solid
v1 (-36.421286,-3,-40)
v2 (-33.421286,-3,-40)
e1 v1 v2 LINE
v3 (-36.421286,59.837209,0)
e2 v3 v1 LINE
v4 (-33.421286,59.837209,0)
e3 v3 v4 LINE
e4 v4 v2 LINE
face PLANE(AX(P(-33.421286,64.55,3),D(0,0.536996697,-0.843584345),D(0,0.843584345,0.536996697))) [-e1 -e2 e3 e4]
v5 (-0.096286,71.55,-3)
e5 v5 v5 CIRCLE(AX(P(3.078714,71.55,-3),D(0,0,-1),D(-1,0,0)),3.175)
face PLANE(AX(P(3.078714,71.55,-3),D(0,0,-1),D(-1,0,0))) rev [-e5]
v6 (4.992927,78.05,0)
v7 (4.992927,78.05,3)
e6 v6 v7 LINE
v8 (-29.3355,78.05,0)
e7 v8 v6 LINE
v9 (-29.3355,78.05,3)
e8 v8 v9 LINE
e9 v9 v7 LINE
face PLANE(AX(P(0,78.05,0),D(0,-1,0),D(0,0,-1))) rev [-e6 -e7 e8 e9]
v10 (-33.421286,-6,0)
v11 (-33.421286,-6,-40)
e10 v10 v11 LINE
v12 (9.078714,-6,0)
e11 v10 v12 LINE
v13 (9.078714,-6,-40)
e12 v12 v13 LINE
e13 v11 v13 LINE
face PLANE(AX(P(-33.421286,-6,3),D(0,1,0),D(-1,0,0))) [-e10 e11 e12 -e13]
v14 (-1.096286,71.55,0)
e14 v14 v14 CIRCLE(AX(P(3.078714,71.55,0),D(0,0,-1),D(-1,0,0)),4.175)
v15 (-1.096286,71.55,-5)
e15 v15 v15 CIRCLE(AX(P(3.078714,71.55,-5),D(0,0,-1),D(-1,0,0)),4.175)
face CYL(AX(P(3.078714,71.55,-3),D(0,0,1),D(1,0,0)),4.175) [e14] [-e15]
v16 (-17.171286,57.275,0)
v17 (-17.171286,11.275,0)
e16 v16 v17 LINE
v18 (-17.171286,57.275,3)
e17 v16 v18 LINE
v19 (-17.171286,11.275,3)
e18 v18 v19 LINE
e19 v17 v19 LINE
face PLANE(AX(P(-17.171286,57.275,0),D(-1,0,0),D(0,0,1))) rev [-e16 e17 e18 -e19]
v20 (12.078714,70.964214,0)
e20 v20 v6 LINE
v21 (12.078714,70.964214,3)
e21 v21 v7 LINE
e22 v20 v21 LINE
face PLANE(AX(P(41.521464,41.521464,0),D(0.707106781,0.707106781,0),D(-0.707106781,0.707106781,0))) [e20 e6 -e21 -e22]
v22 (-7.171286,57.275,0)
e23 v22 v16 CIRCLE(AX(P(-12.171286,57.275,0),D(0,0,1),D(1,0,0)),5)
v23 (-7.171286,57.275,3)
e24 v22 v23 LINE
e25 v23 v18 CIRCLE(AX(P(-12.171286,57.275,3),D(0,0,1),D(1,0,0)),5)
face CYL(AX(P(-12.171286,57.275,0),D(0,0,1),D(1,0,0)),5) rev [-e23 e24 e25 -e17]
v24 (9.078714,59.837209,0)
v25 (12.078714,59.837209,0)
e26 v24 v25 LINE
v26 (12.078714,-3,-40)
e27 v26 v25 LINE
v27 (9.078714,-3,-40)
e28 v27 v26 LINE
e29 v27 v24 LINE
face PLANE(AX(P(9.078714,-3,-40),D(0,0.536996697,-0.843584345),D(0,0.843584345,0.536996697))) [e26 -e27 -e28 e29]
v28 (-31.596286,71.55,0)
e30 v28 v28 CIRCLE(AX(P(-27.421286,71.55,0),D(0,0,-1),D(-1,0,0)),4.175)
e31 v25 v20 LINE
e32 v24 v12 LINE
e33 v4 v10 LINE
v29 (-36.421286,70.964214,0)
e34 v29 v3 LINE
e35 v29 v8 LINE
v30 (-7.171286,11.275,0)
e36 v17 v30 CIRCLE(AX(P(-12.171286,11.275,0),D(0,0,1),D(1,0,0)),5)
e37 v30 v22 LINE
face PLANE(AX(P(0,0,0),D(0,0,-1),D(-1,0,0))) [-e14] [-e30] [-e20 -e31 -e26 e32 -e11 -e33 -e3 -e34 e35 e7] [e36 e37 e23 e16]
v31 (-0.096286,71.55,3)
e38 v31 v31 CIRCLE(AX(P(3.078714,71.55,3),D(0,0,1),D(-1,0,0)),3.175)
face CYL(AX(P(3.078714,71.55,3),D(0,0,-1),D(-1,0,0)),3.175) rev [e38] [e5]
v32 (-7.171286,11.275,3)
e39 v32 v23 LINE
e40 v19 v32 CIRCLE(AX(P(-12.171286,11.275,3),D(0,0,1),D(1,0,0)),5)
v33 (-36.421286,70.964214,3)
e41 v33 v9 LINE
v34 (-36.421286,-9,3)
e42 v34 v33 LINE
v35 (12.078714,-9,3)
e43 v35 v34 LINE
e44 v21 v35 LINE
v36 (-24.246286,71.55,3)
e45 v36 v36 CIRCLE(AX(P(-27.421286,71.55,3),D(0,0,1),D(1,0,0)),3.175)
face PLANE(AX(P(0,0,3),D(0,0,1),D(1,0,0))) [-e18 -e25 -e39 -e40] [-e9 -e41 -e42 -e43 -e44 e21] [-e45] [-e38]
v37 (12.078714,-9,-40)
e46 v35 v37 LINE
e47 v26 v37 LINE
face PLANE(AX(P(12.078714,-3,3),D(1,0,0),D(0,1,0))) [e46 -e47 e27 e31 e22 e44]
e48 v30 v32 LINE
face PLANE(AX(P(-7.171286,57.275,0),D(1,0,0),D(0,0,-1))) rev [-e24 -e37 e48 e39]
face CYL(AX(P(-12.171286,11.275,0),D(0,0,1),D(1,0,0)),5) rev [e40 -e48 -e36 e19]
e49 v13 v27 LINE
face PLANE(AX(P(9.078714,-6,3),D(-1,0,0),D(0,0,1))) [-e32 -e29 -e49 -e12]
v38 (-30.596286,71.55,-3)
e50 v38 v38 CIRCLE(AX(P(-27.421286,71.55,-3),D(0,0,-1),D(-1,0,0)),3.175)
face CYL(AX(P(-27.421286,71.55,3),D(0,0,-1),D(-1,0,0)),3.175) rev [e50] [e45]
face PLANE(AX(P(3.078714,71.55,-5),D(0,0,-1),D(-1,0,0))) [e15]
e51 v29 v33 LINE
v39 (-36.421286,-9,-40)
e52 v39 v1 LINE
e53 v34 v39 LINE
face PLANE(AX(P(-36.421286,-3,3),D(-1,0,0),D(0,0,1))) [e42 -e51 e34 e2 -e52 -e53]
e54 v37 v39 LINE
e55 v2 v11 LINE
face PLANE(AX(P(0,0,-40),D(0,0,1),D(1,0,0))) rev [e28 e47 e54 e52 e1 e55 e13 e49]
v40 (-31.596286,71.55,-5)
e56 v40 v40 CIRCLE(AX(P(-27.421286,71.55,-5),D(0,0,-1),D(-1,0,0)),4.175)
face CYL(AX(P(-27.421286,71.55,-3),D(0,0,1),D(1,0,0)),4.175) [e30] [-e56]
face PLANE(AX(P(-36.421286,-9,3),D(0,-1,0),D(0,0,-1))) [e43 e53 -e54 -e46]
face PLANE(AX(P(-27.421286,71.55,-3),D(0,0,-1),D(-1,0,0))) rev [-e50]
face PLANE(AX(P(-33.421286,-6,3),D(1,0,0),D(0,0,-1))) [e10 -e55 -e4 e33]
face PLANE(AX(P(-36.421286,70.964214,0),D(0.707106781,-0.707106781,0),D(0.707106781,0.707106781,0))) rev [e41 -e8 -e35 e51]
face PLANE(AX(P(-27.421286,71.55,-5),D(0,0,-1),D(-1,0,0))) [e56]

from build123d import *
from build123d.topology import SkipClean

# Parameters (mm, degrees)
SKETCH1_R                = 1.55
SKETCH1_R_2              = 1.5
SKETCH1_R_3              = 11
SKETCH1_R_4              = 3.175
BOSS_EXTRUDE1_DEPTH      = 3
BOSS_EXTRUDE2_START      = 3
SKETCH2_R                = 4.175
SKETCH2_R_2              = 3.175
BOSS_EXTRUDE2_DEPTH      = 3
BOSS_EXTRUDE3_START      = 2
SKETCH3_R                = 4.175
BOSS_EXTRUDE3_DEPTH      = 2
BOSS_EXTRUDE4_DEPTH      = 40
BOSS_EXTRUDE4_DEPTH_BACK = 3
SKETCH5_W                = 3
SKETCH5_H                = 5
BOSS_EXTRUDE5_DEPTH      = 3
BOSS_EXTRUDE7_DEPTH      = 3
BOSS_EXTRUDE9_DEPTH      = 3
BOSS_EXTRUDE10_START     = -3
SKETCH9_R                = 1.55
SKETCH9_R_2              = 1.5
SKETCH9_R_3              = 11
BOSS_EXTRUDE10_DEPTH     = 3
CUT_EXTRUDE1_DEPTH       = 3
SKETCH11_W               = 3
SKETCH11_H               = 75.55
BOSS_EXTRUDE11_DEPTH     = 3
CHAMFER1_SIZE            = 3
BOSS_EXTRUDE12_DEPTH     = 3
BOSS_EXTRUDE13_DEPTH     = 3
BOSS_EXTRUDE14_DEPTH     = 3


with BuildPart() as part:
    # Sketch1 → Boss-Extrude1 (new body)
    with BuildSketch(Plane.XY):
        Polygon((-33.421286346, -6), (-33.421286346, 36.5), (-33.421286346, 72.55), (-28.421286346, 77.55), (4.078713654, 77.55), (9.078713654, 72.55), (9.078713654, 36.5), (9.078713654, -6), align=None)
        with Locations((2.92772434, 30.5)):
            Circle(SKETCH1_R, mode=Mode.SUBTRACT)
        with Locations(Location((2.92772434, -0.5, 0), (0, 0, 180))):
            Circle(SKETCH1_R_2, mode=Mode.SUBTRACT)
        with Locations((-27.671286346, -0.5)):
            Circle(SKETCH1_R_2, mode=Mode.SUBTRACT)
        with Locations(Location((-28.07227566, 30.5, 0), (0, 0, 180))):
            Circle(SKETCH1_R_2, mode=Mode.SUBTRACT)
        with Locations((-12.171286346, 15.25)):
            Circle(SKETCH1_R_3, mode=Mode.SUBTRACT)
        with Locations((-27.421286346, 71.55)):
            Circle(SKETCH1_R_4, mode=Mode.SUBTRACT)
        with Locations(Location((3.078713654, 71.55, 0), (0, 0, 180))):
            Circle(SKETCH1_R_4, mode=Mode.SUBTRACT)
    extrude(amount=BOSS_EXTRUDE1_DEPTH)

    # Sketch2 → Boss-Extrude2 (add)
    # profile 1 of 2: a face of its own
    with SkipClean():  # the faces are left unmerged after this step: merging them gives an invalid solid
        with BuildSketch(Plane(origin=(0, 0, 0), x_dir=(-1, 0, 0), z_dir=(0, 0, -1)).offset(BOSS_EXTRUDE2_START)):
            with Locations((-3.078713654, 71.55)):
                Circle(SKETCH2_R)
            with Locations((-3.078713654, 71.55)):
                Circle(SKETCH2_R_2, mode=Mode.SUBTRACT)
        # profile 2 of 2: a face of its own
        with BuildSketch(Plane(origin=(0, 0, 0), x_dir=(-1, 0, 0), z_dir=(0, 0, -1)).offset(BOSS_EXTRUDE2_START)):
            with Locations((27.421286346, 71.55)):
                Circle(SKETCH2_R)
            with Locations((27.421286346, 71.55)):
                Circle(SKETCH2_R_2, mode=Mode.SUBTRACT)
        extrude(amount=-BOSS_EXTRUDE2_DEPTH)

    # Sketch3 → Boss-Extrude3 (add)
    with SkipClean():  # the faces are left unmerged after this step: merging them gives an invalid solid
        with BuildSketch(Plane(origin=(0, 0, -3), x_dir=(-1, 0, 0), z_dir=(0, 0, -1)).offset(BOSS_EXTRUDE3_START)):
            with Locations((-3.078713654, 71.55)):
                Circle(SKETCH3_R)
            with Locations((27.421286346, 71.55)):
                Circle(SKETCH3_R)
        extrude(amount=-BOSS_EXTRUDE3_DEPTH)

    # Sketch5 → Boss-Extrude5 (add)
    with SkipClean():  # the faces are left unmerged after this step: merging them gives an invalid solid
        with BuildSketch(Plane.XY.offset(3)):
            with Locations((10.578713654, 45.531399611)):
                Rectangle(SKETCH5_W, SKETCH5_H)
            with Locations((-34.921286346, 45.531399611)):
                Rectangle(SKETCH5_W, SKETCH5_H)
        extrude(amount=-BOSS_EXTRUDE5_DEPTH)



with BuildPart() as body_2:
    # Sketch4 → Boss-Extrude4 (new, two sides: drawn at the far end of the back side and taken through both)
    with BuildSketch(Plane(origin=(0, 0, 0), x_dir=(-1, 0, 0), z_dir=(0, 0, -1)).offset(-BOSS_EXTRUDE4_DEPTH_BACK)):
        Polygon((33.421286346, -6), (-9.078713654, -6), (-9.078713654, -3), (-12.078713654, -3), (-12.078713654, -9), (-9.078713654, -9), (34.421286346, -9), (36.421286346, -9), (36.421286346, -3), (33.421286346, -3), align=None)
    extrude(amount=BOSS_EXTRUDE4_DEPTH + BOSS_EXTRUDE4_DEPTH_BACK)


with BuildPart() as part_1:
    with SkipClean():  # the faces are left unmerged after this step: merging them gives an invalid solid
        add(part.part)

        add(body_2.part)  # Boss-Extrude7 merges body 2
        # Sketch6 → Boss-Extrude7 (add)
        with BuildSketch(Plane(origin=(9.078713654, 0, 0), x_dir=(0, 0, -1), z_dir=(1, 0, 0))):
            Polygon((0, 48.031399611), (40, -3), (36.080844313, -3), (0, 43.031399611), align=None)
        extrude(amount=BOSS_EXTRUDE7_DEPTH)

    # Sketch8 → Boss-Extrude9 (add)
    with SkipClean():  # the faces are left unmerged after this step: merging them gives an invalid solid
        with BuildSketch(Plane.ZY.offset(36.421286346)):
            Polygon((0, 48.031399611), (0, 43.031399611), (-36.080844313, -3), (-40, -3), align=None)
        extrude(amount=-BOSS_EXTRUDE9_DEPTH)

    # Sketch9 → Boss-Extrude10 (add)
    with SkipClean():  # the faces are left unmerged after this step: merging them gives an invalid solid
        with BuildSketch(Plane.XY.offset(3).offset(BOSS_EXTRUDE10_START)):
            with Locations((2.92772434, 30.5)):
                Circle(SKETCH9_R)
            with Locations((-28.07227566, 30.5)):
                Circle(SKETCH9_R_2)
            with Locations((-27.671286346, -0.5)):
                Circle(SKETCH9_R_2)
            with Locations((2.92772434, -0.5)):
                Circle(SKETCH9_R_2)
            with Locations((-12.171286346, 15.25)):
                Circle(SKETCH9_R_3)
        extrude(amount=BOSS_EXTRUDE10_DEPTH)

    # Sketch10 → Cut-Extrude1 (cut)
    with BuildSketch(Plane.XY.offset(3)):
        with BuildLine():
            Line((-7.171286346, 57.275), (-7.171286346, 11.275))
            ThreePointArc((-7.171286346, 11.275), (-12.171286346, 6.275), (-17.171286346, 11.275))
            Line((-17.171286346, 11.275), (-17.171286346, 57.275))
            ThreePointArc((-17.171286346, 57.275), (-12.171286346, 62.275), (-7.171286346, 57.275))
        make_face()
    extrude(amount=-CUT_EXTRUDE1_DEPTH, mode=Mode.SUBTRACT)

    # Sketch11 → Boss-Extrude11 (add)
    with BuildSketch(Plane.XY.offset(3)):
        with Locations((-34.921286346, 34.775)):
            Rectangle(SKETCH11_W, SKETCH11_H)
        with Locations((10.578713654, 34.775)):
            Rectangle(SKETCH11_W, SKETCH11_H)
    extrude(amount=-BOSS_EXTRUDE11_DEPTH)

    # Chamfer1
    chamfer1_edges = [part_1.edges().sort_by_distance(p)[0] for p in [
        (-36.421286346, 72.55, 1.5),
        (12.078713654, 72.55, 1.5),
    ]]
    chamfer(chamfer1_edges, length=CHAMFER1_SIZE - 0.0001)  # a hair under: the kernel refuses the full size

    # Sketch12 → Boss-Extrude12 (add)
    with BuildSketch(Plane(origin=(12.078713654, 0, 0), x_dir=(0, 0, -1), z_dir=(1, 0, 0))):
        Polygon((-3, 64.55), (-3, -9), (40, -9), (40, -3), align=None)
    extrude(amount=-BOSS_EXTRUDE12_DEPTH)

    # Sketch13 → Boss-Extrude13 (add)
    with BuildSketch(Plane.ZY.offset(36.421286346)):
        Polygon((3, -9), (3, 64.55), (-40, -3), (-40, -9), align=None)
    extrude(amount=-BOSS_EXTRUDE13_DEPTH)

    # Sketch14 → Boss-Extrude14 (add)
    with BuildSketch(Plane.XY.offset(3)):
        Polygon((-36.421286346, 70.964213562), (-36.421286346, 69.55), (-28.421286346, 77.55), (4.078713654, 77.55), (12.078713654, 69.55), (12.078713654, 70.964213562), (4.992927216, 78.05), (-29.335499908, 78.05), align=None)
    extrude(amount=-BOSS_EXTRUDE14_DEPTH)


solid = part_1.part
